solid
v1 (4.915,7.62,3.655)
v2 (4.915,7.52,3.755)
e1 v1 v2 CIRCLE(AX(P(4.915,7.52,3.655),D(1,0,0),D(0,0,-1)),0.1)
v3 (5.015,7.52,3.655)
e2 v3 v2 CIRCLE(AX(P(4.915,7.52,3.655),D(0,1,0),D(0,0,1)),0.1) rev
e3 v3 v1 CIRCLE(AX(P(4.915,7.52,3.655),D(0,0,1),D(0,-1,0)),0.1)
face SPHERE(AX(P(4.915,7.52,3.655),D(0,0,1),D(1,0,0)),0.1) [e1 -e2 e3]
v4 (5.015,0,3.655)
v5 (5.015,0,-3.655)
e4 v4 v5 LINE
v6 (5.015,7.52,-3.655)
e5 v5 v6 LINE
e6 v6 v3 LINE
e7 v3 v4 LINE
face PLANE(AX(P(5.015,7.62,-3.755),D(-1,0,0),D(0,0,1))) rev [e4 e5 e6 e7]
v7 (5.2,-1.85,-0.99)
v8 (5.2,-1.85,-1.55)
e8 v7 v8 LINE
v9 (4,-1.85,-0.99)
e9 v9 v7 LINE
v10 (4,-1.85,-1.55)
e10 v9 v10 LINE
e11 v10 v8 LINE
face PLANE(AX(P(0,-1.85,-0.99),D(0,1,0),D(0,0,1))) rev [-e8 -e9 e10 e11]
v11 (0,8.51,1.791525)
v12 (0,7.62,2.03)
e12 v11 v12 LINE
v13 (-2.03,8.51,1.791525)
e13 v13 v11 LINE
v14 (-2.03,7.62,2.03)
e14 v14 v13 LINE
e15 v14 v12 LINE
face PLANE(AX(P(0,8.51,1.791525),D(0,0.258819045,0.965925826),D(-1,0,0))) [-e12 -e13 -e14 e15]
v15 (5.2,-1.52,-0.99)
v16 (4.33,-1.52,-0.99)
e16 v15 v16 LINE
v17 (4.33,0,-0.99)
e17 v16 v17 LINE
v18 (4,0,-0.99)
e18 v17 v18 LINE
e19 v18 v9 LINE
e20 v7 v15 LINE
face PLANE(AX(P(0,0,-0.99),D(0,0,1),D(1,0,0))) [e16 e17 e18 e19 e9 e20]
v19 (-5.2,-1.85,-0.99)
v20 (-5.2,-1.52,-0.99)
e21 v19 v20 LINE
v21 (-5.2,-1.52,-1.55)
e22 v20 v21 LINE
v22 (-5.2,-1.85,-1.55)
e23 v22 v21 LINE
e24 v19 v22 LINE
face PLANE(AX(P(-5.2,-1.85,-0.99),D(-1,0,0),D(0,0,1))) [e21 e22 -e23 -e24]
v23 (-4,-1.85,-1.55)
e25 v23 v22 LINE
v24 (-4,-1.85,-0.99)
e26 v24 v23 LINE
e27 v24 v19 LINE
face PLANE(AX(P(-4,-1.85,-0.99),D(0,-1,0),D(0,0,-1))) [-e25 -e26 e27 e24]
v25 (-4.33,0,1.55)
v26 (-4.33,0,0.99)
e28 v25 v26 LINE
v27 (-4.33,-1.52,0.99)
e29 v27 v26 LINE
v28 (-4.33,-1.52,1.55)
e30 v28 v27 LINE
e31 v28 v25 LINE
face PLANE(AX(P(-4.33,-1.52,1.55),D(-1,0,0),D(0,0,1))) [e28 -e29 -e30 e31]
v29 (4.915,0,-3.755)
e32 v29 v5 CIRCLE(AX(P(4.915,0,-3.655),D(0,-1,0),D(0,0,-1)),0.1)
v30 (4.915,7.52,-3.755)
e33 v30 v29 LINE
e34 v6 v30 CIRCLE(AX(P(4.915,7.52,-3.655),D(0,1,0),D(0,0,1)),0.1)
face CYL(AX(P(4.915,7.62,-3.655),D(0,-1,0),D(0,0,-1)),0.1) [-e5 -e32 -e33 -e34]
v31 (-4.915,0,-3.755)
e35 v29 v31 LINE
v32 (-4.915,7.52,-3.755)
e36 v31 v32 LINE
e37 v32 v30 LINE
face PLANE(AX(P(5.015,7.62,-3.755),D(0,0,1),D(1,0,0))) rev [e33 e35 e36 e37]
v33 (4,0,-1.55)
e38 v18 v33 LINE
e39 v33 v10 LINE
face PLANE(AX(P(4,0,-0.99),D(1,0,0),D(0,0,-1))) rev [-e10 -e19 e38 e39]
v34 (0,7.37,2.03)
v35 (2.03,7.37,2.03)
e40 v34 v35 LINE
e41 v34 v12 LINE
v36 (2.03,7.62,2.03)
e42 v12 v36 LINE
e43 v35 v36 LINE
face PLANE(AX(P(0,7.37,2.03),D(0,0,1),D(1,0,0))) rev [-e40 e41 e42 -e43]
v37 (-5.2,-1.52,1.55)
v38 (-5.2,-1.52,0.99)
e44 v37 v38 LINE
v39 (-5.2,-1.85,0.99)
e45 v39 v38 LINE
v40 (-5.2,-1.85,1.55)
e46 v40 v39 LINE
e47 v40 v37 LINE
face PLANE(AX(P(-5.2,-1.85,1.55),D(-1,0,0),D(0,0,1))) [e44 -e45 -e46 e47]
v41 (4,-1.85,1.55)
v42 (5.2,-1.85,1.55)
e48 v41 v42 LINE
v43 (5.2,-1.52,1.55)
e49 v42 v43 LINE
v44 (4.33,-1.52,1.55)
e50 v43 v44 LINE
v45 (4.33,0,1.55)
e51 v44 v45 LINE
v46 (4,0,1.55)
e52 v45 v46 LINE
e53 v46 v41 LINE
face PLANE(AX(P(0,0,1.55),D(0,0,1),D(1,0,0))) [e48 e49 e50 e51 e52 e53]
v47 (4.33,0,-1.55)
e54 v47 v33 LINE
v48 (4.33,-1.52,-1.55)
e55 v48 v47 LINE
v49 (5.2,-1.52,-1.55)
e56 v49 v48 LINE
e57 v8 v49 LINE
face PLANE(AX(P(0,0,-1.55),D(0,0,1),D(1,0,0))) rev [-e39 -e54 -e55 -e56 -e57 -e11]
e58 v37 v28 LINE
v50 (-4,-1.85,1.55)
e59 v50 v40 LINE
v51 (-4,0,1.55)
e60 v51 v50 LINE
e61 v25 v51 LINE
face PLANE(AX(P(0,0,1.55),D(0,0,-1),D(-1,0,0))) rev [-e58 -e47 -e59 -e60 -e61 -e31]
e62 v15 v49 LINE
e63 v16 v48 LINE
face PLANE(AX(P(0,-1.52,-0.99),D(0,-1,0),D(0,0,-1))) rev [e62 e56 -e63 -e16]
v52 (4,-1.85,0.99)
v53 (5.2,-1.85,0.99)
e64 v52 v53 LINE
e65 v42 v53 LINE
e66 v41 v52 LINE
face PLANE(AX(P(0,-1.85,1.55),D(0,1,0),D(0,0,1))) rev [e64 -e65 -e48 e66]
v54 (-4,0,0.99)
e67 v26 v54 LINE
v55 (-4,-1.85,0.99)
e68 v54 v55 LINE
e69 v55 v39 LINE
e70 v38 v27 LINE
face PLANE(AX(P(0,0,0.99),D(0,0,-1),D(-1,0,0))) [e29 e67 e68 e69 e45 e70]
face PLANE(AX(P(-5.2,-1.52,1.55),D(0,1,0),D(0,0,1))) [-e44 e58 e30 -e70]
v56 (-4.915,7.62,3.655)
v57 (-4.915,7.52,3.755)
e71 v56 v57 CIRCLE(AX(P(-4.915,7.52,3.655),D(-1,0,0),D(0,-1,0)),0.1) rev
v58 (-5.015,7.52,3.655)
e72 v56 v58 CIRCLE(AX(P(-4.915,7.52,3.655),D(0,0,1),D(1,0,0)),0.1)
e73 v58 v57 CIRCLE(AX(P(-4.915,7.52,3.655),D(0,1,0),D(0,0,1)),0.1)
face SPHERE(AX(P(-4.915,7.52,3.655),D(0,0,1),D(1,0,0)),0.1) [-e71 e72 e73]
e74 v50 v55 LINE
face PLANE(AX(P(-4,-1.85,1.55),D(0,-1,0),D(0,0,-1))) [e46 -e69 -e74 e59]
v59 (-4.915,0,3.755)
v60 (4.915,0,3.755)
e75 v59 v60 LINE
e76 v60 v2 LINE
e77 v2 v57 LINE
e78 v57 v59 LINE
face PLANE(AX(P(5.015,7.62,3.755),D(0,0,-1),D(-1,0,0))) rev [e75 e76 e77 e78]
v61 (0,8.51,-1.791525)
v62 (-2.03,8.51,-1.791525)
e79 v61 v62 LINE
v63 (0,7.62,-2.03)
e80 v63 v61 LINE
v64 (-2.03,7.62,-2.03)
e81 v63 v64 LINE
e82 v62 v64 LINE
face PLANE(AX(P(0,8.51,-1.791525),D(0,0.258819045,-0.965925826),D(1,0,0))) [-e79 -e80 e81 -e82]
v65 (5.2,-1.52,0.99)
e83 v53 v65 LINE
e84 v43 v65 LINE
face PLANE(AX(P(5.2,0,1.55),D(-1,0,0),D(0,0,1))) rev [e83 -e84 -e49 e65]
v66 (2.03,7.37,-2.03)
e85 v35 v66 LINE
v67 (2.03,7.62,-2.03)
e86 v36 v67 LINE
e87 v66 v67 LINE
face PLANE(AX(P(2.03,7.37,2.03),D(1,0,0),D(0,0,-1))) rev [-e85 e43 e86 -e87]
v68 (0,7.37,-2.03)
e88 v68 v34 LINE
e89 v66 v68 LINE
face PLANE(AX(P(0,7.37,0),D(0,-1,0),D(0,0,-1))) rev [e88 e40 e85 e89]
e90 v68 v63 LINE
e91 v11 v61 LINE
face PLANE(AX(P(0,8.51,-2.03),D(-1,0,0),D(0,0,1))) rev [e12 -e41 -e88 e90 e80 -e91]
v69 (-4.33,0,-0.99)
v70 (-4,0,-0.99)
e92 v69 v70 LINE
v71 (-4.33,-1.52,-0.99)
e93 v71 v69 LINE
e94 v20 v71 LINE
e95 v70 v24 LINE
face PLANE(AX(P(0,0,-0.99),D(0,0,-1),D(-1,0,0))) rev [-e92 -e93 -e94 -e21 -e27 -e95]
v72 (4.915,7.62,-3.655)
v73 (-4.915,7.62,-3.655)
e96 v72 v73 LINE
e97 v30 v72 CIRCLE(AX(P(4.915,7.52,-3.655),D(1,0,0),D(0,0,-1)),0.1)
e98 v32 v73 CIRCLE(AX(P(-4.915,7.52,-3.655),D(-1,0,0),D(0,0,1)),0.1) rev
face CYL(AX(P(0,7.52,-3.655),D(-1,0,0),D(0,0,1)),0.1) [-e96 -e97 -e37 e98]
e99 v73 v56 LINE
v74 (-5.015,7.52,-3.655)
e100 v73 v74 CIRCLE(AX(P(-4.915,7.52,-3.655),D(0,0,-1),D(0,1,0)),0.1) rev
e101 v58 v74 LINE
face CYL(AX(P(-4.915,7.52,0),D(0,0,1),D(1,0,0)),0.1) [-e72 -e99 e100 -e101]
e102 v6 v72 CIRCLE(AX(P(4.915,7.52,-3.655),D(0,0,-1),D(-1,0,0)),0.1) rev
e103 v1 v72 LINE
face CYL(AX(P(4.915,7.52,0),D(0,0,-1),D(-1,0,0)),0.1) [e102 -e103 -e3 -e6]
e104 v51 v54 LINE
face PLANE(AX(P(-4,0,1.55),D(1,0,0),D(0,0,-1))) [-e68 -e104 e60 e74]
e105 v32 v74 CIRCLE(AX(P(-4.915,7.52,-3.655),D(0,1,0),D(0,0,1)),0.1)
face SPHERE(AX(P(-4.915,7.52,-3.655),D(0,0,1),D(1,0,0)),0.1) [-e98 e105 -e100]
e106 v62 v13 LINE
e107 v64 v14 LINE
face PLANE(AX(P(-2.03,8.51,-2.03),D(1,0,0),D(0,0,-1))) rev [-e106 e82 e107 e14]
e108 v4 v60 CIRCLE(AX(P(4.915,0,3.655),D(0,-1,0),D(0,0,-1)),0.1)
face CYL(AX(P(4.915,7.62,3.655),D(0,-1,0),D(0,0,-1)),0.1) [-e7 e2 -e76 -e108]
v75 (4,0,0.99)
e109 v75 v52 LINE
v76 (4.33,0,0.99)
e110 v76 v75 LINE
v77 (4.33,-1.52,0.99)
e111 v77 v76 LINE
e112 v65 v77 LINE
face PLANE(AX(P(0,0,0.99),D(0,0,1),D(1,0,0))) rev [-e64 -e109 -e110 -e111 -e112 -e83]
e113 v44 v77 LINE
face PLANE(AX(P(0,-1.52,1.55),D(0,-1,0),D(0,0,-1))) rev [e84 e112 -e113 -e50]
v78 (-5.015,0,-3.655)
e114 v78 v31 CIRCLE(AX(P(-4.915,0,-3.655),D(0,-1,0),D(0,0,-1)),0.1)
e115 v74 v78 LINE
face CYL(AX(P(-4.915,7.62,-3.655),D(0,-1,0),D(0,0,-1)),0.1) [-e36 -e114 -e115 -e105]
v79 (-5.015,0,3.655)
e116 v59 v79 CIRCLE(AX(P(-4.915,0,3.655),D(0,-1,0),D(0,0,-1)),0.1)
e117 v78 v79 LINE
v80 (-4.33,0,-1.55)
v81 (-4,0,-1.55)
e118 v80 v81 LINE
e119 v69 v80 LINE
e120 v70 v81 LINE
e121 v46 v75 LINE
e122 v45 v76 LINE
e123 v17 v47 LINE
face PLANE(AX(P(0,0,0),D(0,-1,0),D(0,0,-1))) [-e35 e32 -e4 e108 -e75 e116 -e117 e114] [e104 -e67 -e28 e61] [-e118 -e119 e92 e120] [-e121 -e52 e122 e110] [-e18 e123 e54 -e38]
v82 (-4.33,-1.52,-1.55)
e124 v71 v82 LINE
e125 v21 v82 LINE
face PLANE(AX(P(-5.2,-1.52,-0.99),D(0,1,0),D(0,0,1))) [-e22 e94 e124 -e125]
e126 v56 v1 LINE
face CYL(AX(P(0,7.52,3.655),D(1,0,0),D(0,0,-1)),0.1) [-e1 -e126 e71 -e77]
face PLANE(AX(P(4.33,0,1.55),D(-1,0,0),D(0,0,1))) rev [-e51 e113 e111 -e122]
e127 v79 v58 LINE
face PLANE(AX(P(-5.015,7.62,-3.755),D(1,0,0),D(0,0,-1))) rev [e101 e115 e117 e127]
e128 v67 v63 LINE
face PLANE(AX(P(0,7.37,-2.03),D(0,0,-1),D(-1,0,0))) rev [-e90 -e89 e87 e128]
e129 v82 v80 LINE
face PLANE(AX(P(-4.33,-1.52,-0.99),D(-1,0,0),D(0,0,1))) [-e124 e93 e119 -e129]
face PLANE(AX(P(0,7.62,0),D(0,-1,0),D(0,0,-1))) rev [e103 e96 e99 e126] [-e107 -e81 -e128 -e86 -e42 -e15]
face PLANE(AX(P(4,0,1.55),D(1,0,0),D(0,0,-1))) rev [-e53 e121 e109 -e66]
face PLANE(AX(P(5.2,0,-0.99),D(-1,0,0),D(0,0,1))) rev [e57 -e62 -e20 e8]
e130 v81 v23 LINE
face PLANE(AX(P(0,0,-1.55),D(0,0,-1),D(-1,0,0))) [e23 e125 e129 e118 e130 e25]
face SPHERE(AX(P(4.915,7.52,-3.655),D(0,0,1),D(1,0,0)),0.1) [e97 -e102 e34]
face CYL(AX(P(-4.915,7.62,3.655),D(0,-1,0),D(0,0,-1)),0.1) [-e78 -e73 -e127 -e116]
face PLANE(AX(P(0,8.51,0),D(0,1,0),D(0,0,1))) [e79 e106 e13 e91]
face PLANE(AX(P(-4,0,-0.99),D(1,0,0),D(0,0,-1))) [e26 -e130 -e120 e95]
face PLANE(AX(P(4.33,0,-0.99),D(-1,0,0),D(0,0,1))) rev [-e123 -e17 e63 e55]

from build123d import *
from OCP.BRepFilletAPI import BRepFilletAPI_MakeChamfer

# Parameters (mm, degrees)
SKETCH1_W           = 10.03
SKETCH1_H           = 7.51
BOSS_EXTRUDE1_DEPTH = 7.62
SKETCH2_W           = 2.03
SKETCH2_H           = 4.06
BOSS_EXTRUDE2_DEPTH = 0.89
CHAMFER1_SIZE       = 0.89
CHAMFER1_SIZE_2     = 0.238474781
SKETCH3_W           = 2.03
SKETCH3_H           = 4.06
CUT_EXTRUDE1_DEPTH  = 0.25
BOSS_EXTRUDE3_DEPTH = 0.28
LPATTERN1_COUNT     = 2
LPATTERN1_PITCH     = 2.54
FILLET1_R           = 0.1


with BuildPart() as part:
    # Sketch1 → Boss-Extrude1 (new body)
    with BuildSketch(Plane(origin=(0, 0, 0), x_dir=(1, 0, 0), z_dir=(0, 1, 0))):
        Rectangle(SKETCH1_W, SKETCH1_H)
    extrude(amount=BOSS_EXTRUDE1_DEPTH)

    # Sketch2 → Boss-Extrude2 (add)
    with BuildSketch(Plane(origin=(0, 7.62, 0), x_dir=(1, 0, 0), z_dir=(0, 1, 0))):
        with Locations((-1.015, 0)):
            Rectangle(SKETCH2_W, SKETCH2_H)
    extrude(amount=BOSS_EXTRUDE2_DEPTH)

    # Chamfer1
    chamfer1_edges_1 = [part.edges().sort_by_distance(p)[0] for p in [
        (-1.015, 8.51, -2.03),
    ]]
    chamfer1_side_1 = [part.faces().sort_by_distance(p)[0] for p in [
        (-1.015, 8.505230504, -2.03),
    ]]
    chamfer1_edges_2 = [part.edges().sort_by_distance(p)[0] for p in [
        (-1.015, 8.51, 2.03),
    ]]
    chamfer1_side_2 = [part.faces().sort_by_distance(p)[0] for p in [
        (-1.015, 8.505230504, 2.03),
    ]]
    chamfer1 = BRepFilletAPI_MakeChamfer(part.part.solid().wrapped)
    for e in chamfer1_edges_1:
        chamfer1.Add(CHAMFER1_SIZE - 0.0001, CHAMFER1_SIZE_2 - 0.0001, e.wrapped, chamfer1_side_1[0].wrapped)
    for e in chamfer1_edges_2:
        chamfer1.Add(CHAMFER1_SIZE - 0.0001, CHAMFER1_SIZE_2 - 0.0001, e.wrapped, chamfer1_side_2[0].wrapped)
    add(Compound.cast(chamfer1.Shape()), mode=Mode.REPLACE)  # a hair under: the kernel refuses the full size

    # Sketch3 → Cut-Extrude1 (cut)
    with BuildSketch(Plane(origin=(0, 7.62, 0), x_dir=(1, 0, 0), z_dir=(0, 1, 0))):
        with Locations((1.015, 0)):
            Rectangle(SKETCH3_W, SKETCH3_H)
    extrude(amount=-CUT_EXTRUDE1_DEPTH, mode=Mode.SUBTRACT)

    # Sketch4 → Boss-Extrude3 (add, symmetric)
    with BuildSketch(Plane.XY.offset(1.27)):
        Polygon((4.33, 0), (4, 0), (4, -1.85), (5.2, -1.85), (5.2, -1.52), (4.33, -1.52), align=None)
        Polygon((-4, -1.85), (-5.2, -1.85), (-5.2, -1.52), (-4.33, -1.52), (-4.33, 0), (-4, 0), align=None)
    boss_extrude3 = extrude(amount=BOSS_EXTRUDE3_DEPTH, both=True)

    # LPattern1: Boss-Extrude3 ×2
    with Locations(*[(0, 0, -i * LPATTERN1_PITCH) for i in range(1, LPATTERN1_COUNT)]):
        add(boss_extrude3)

    # Fillet1
    fillet1_edges = [part.edges().sort_by_distance(p)[0] for p in [
        (5.015, 7.62, 0),
        (0, 7.62, -3.755),
        (-5.015, 7.62, 0),
        (0, 7.62, 3.755),
        (-5.015, 3.81, -3.755),
        (5.015, 3.81, -3.755),
        (5.015, 3.81, 3.755),
        (-5.015, 3.81, 3.755),
    ]]
    fillet(fillet1_edges, radius=FILLET1_R)


solid = part.part
